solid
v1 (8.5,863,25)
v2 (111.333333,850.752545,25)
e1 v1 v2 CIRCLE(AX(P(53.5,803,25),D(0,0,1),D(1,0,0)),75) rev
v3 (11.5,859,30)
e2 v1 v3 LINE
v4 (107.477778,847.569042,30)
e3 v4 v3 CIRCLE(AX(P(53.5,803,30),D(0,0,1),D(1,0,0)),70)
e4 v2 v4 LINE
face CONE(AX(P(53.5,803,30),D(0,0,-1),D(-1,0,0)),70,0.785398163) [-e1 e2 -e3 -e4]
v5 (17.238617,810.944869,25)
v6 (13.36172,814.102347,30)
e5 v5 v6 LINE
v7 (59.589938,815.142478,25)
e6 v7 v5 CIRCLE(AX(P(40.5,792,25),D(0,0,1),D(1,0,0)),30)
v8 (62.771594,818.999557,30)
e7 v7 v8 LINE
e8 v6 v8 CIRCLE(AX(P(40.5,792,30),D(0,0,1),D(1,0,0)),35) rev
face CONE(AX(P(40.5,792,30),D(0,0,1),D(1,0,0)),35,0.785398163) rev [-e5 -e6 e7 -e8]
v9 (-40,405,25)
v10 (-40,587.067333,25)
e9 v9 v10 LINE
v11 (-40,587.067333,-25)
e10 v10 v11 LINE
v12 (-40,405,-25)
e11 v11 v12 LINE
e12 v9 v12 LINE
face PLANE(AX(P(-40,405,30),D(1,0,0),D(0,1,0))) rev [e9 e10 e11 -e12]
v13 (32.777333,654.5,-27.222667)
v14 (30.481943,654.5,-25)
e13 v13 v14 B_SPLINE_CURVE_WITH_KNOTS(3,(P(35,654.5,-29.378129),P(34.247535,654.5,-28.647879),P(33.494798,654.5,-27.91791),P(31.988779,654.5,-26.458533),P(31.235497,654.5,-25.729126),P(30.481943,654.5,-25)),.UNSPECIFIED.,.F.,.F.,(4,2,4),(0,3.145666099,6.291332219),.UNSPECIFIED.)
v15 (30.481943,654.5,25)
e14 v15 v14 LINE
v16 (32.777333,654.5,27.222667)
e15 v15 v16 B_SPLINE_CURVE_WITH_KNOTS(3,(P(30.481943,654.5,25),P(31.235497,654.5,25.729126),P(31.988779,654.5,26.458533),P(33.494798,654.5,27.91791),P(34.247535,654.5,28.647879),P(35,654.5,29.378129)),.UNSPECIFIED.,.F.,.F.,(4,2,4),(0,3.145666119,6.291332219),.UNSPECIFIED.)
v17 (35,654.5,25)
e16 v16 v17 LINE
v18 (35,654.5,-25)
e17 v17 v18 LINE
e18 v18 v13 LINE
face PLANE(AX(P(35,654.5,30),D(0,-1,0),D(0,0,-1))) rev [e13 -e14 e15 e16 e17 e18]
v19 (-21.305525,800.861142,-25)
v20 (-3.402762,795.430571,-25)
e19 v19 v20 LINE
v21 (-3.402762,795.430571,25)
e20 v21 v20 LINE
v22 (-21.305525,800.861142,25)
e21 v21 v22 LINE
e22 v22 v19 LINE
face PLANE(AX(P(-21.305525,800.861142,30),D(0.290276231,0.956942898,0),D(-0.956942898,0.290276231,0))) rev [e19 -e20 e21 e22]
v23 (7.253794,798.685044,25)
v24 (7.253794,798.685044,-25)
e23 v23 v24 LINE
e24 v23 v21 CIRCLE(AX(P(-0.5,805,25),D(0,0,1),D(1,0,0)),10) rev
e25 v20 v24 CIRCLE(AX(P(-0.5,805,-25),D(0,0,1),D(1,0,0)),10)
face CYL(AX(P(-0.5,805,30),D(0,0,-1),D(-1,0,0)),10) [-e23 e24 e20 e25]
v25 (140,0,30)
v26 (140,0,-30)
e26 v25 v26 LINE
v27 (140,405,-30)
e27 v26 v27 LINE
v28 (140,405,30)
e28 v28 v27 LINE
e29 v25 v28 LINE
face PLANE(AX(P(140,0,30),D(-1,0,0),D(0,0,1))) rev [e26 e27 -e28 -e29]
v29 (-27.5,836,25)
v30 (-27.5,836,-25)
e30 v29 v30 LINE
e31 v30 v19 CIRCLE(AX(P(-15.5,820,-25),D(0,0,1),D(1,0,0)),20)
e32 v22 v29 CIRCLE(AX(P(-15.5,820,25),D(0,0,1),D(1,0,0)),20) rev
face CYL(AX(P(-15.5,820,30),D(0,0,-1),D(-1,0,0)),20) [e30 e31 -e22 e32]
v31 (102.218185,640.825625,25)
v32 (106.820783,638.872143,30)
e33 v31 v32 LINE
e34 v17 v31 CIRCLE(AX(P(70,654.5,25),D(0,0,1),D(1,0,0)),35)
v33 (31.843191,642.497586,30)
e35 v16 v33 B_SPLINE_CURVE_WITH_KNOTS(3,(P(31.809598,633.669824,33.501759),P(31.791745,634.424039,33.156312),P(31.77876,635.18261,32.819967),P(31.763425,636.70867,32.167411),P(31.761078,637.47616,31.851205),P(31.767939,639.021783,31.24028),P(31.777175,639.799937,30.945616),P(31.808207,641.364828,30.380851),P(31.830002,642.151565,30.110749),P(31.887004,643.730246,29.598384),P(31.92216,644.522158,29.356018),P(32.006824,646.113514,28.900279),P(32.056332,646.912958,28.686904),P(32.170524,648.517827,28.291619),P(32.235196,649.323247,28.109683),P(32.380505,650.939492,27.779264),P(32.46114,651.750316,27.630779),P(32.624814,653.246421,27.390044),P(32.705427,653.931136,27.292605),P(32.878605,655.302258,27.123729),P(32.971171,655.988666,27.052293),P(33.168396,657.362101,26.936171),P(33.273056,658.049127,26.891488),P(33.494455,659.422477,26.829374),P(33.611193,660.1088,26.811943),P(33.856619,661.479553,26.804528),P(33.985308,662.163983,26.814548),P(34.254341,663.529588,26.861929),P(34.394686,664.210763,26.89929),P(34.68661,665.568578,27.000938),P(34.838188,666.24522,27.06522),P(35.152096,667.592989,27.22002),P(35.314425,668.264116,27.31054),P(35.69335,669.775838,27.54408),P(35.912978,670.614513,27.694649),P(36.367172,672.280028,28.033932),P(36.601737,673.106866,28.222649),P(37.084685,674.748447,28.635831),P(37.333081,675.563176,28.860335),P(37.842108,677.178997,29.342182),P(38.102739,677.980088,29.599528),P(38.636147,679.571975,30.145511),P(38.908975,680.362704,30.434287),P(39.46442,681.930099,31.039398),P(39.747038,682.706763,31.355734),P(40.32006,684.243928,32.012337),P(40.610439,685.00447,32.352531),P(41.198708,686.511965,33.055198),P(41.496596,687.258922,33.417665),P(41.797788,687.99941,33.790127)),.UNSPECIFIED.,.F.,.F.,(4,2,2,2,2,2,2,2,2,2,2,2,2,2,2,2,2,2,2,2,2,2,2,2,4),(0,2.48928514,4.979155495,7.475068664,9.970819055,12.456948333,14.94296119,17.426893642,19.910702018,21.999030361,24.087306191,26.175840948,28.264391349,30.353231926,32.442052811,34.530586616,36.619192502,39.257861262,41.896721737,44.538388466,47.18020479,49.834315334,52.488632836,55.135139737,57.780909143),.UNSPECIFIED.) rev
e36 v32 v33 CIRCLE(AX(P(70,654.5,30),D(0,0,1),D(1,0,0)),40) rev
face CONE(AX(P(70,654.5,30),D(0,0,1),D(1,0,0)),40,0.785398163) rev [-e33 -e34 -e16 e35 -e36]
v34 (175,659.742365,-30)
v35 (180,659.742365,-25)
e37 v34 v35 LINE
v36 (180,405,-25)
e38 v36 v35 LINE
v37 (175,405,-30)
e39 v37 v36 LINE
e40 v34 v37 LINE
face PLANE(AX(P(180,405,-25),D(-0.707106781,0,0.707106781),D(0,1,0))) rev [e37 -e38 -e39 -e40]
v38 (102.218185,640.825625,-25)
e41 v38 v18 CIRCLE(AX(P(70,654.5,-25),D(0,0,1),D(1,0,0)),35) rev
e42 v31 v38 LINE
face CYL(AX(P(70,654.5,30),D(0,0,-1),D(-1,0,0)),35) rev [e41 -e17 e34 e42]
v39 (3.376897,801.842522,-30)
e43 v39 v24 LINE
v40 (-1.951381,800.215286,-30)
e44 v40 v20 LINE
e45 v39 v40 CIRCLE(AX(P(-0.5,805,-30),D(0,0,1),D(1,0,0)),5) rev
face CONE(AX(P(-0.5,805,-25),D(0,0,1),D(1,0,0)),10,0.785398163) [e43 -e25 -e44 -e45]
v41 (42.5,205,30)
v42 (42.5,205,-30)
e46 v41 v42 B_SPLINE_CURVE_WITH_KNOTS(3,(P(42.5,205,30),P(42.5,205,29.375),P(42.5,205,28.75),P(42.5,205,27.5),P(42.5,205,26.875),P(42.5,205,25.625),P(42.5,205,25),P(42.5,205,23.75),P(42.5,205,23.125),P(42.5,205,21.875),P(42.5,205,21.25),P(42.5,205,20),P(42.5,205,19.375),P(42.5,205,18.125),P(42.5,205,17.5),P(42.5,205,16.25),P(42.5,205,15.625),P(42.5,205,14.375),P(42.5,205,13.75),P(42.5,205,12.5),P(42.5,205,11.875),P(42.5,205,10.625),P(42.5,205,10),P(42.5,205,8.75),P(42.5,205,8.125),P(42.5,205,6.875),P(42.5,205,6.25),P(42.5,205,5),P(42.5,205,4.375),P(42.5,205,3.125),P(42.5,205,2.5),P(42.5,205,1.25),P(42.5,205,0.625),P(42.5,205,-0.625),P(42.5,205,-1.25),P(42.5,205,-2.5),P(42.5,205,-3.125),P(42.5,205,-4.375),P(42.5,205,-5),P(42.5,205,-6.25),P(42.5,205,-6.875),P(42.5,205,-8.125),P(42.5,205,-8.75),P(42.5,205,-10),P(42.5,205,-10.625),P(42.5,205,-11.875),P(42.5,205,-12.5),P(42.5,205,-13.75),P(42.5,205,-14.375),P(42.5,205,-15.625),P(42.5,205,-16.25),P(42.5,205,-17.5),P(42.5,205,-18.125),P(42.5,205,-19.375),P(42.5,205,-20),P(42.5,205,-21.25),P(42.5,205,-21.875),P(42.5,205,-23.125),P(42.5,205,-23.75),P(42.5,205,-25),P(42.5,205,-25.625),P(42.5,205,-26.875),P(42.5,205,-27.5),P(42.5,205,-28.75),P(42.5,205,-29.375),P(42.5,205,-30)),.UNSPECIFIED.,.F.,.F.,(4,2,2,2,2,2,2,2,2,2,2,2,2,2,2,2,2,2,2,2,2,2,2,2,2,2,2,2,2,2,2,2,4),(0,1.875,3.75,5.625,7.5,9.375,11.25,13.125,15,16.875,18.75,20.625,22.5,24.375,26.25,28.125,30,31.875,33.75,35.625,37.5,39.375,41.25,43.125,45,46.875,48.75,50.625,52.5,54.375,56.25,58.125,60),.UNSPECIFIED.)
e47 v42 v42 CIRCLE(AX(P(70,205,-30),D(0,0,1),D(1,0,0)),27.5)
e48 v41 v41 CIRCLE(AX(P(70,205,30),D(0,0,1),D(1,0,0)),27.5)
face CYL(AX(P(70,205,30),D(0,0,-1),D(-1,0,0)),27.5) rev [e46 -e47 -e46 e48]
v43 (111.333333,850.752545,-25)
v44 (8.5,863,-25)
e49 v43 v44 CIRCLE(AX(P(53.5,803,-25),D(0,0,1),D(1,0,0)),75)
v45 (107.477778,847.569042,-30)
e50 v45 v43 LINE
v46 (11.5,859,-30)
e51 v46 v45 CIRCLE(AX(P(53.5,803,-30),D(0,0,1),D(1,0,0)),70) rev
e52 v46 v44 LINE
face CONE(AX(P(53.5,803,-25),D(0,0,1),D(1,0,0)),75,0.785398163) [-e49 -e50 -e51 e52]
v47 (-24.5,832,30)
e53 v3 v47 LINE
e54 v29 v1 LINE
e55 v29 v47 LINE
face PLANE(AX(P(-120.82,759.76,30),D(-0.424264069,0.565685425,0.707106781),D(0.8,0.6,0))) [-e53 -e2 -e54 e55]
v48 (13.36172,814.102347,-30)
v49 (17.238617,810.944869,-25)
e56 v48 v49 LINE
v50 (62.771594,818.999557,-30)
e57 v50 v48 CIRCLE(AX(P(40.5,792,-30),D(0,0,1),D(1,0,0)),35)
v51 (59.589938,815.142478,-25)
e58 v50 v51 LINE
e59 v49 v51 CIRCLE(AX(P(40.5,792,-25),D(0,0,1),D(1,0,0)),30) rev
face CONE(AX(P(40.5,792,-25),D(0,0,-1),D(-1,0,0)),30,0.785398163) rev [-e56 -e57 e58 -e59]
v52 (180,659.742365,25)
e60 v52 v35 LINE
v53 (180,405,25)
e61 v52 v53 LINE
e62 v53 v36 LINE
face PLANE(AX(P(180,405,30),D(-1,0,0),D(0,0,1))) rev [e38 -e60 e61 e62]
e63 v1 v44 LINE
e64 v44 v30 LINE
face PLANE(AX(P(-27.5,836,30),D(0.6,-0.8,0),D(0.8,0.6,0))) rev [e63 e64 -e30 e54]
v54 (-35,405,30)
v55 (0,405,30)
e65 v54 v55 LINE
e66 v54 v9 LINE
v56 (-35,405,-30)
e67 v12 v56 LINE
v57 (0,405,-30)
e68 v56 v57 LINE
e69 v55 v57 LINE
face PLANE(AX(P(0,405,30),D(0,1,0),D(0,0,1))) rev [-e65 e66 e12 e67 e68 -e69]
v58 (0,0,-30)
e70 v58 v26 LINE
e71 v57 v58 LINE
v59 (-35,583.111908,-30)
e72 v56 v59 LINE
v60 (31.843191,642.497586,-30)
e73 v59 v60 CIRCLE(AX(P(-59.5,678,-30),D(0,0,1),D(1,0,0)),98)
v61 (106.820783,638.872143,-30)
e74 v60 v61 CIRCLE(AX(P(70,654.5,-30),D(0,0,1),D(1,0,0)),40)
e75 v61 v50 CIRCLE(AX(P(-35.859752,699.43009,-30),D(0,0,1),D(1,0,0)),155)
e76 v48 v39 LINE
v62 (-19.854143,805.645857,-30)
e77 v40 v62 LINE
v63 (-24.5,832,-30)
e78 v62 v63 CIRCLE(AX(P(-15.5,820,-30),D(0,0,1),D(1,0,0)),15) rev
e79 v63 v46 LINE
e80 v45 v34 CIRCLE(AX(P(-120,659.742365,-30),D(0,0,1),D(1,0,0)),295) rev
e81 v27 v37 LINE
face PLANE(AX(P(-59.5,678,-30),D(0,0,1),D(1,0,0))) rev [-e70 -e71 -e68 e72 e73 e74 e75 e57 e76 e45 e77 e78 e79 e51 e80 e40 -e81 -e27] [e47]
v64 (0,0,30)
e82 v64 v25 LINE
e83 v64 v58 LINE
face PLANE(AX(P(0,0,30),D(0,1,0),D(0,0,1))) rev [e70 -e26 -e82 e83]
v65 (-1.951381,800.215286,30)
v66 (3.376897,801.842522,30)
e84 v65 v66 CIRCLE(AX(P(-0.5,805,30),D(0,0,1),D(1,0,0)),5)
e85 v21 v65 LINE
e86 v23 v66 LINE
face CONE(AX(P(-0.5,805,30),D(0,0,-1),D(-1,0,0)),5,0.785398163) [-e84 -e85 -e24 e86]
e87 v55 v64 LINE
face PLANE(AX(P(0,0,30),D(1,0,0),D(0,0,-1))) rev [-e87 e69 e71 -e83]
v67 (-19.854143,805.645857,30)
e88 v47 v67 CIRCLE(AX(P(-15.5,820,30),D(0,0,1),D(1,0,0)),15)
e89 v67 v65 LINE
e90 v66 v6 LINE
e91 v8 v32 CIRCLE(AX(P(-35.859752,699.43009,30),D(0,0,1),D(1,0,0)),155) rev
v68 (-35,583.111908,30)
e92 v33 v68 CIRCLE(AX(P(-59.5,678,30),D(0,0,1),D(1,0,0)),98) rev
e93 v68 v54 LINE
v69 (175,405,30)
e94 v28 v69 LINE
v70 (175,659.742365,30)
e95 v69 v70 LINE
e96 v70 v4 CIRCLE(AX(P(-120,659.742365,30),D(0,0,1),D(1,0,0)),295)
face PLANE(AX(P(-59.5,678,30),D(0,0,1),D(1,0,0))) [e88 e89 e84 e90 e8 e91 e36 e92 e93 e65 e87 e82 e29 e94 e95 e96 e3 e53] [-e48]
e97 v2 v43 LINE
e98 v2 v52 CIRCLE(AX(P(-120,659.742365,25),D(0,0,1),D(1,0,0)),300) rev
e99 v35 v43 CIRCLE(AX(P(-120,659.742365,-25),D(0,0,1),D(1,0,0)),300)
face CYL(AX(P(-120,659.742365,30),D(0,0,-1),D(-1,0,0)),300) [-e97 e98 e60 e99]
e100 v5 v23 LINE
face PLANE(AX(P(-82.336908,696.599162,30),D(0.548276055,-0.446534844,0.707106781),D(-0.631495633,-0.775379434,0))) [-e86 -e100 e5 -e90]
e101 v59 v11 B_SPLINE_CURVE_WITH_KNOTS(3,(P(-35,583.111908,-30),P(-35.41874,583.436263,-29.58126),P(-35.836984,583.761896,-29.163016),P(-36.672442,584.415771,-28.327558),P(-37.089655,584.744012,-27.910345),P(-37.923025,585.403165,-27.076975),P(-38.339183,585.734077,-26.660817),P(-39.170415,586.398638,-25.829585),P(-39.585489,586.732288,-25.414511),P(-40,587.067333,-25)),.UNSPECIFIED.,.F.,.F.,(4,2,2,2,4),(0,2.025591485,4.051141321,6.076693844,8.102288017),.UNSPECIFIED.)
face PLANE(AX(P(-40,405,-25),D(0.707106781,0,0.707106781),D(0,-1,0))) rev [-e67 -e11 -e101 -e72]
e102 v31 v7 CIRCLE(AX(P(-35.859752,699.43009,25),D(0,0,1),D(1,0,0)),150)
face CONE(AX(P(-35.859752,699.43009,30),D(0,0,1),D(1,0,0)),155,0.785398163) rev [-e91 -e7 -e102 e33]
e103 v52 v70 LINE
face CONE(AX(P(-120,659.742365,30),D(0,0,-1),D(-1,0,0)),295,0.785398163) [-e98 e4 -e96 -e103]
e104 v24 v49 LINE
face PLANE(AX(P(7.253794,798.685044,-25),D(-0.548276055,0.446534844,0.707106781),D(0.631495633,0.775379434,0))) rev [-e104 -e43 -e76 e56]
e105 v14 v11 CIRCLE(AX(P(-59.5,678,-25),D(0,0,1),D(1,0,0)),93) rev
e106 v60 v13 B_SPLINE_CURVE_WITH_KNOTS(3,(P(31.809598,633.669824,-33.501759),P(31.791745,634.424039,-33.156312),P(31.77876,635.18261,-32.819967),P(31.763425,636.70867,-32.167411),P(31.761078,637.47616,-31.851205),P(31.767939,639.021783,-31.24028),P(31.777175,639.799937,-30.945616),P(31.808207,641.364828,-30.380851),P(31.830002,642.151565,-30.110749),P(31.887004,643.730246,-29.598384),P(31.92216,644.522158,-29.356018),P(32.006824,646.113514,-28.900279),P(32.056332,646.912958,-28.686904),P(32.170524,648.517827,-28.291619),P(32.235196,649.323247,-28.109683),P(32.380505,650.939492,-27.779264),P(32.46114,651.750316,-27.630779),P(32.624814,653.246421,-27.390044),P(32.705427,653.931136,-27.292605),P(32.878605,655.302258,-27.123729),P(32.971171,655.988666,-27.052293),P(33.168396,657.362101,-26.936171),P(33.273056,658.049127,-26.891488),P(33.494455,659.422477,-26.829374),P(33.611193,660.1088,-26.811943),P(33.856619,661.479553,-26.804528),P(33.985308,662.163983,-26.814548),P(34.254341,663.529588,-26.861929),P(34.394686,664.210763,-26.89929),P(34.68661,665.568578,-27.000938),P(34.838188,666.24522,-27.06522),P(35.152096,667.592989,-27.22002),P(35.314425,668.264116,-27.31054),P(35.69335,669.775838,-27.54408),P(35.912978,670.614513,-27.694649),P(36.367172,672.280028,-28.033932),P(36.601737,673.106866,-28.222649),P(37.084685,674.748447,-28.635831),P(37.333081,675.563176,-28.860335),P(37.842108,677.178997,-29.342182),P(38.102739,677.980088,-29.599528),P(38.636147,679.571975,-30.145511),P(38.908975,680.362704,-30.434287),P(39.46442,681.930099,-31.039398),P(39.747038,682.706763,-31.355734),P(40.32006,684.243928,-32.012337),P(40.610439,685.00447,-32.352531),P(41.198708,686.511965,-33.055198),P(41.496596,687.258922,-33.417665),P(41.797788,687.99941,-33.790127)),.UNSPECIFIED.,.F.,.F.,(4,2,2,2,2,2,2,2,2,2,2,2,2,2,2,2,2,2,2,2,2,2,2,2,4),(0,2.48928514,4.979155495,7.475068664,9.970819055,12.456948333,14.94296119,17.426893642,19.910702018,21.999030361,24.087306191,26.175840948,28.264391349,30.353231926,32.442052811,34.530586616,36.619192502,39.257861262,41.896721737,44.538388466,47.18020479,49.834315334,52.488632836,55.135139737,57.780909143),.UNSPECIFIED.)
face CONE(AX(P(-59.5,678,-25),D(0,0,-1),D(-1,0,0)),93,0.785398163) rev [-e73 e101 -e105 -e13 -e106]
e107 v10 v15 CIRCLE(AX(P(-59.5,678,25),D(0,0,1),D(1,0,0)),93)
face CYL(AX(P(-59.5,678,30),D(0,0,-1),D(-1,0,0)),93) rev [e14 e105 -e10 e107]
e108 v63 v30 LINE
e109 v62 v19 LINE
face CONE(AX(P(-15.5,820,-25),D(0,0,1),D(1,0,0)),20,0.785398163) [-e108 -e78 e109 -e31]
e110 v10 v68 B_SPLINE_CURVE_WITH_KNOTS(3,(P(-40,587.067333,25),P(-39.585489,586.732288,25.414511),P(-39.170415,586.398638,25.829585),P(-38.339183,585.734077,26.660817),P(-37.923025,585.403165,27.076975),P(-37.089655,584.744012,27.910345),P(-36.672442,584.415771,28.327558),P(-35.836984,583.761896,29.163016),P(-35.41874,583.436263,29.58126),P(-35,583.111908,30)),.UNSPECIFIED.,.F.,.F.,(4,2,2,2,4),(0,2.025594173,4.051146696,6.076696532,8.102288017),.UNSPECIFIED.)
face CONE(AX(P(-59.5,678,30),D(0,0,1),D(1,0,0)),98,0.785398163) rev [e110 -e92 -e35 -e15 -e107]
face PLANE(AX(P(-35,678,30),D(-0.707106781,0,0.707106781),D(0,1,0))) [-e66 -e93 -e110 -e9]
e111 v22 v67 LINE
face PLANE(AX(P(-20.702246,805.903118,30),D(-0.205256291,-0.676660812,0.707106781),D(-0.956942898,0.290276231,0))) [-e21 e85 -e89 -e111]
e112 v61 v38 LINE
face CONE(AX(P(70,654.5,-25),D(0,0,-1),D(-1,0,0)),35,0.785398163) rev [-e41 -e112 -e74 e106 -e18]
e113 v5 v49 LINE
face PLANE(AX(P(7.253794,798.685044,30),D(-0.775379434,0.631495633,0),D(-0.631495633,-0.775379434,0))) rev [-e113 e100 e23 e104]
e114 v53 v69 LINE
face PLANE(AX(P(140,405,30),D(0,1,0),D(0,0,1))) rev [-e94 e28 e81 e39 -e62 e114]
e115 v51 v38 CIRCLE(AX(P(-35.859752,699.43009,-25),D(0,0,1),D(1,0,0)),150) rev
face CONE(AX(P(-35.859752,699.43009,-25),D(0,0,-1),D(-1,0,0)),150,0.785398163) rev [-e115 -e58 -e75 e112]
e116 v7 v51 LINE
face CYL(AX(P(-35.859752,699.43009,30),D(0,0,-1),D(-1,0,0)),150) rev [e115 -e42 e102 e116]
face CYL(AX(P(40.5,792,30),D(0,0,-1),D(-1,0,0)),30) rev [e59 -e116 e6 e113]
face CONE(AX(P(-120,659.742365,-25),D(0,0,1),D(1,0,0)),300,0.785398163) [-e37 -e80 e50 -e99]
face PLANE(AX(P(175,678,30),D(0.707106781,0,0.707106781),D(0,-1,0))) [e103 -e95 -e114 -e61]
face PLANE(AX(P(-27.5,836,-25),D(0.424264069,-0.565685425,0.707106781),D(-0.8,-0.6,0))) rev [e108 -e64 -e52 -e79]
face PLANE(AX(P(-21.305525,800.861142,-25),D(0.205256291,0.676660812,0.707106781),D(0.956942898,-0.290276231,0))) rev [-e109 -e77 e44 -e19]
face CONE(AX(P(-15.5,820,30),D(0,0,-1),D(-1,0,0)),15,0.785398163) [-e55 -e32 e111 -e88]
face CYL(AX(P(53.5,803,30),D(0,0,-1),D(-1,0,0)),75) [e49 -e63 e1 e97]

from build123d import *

# Parameters (mm, degrees)
SKETCH_1_R      = 27.5
EXTRUDE_1_DEPTH = 30
CHAMFER_1_SIZE  = 5


with BuildPart() as part:
    # 草图1 → 凸台-拉伸1 (new, symmetric)
    with BuildSketch(Plane.XY):
        with BuildLine():
            Line((140, 405), (180, 405))
            Line((180, 405), (180, 659.74236495))
            ThreePointArc((180, 659.74236495), (162.31188427, 761.231280601), (111.333333333, 850.752545017))
            ThreePointArc((111.333333333, 850.752545017), (62.369816768, 877.473662126), (8.5, 863))
            Line((8.5, 863), (-27.5, 836))
            ThreePointArc((-27.5, 836), (-35.196294357, 816.527826528), (-21.305524623, 800.861142044))
            Line((-21.305524623, 800.861142044), (-3.402762311, 795.430571022))
            ThreePointArc((-3.402762311, 795.430571022), (2.420792013, 795.436058657), (7.253794336, 798.685043674))
            Line((7.253794336, 798.685043674), (17.238616993, 810.944868978))
            ThreePointArc((17.238616993, 810.944868978), (37.541078237, 821.853723084), (59.589937945, 815.142477595))
            ThreePointArc((59.589937945, 815.142477595), (109.84673197, 735.06182538), (102.218185324, 640.825624899))
            ThreePointArc((102.218185324, 640.825624899), (63.022768685, 620.202503835), (35, 654.5))
            Line((35, 654.5), (30.481942633, 654.5))
            ThreePointArc((30.481942633, 654.5), (4.791252117, 610.80152605), (-40, 587.067332603))
            Line((-40, 587.067332603), (-40, 405))
            Line((-40, 405), (0, 405))
            Line((0, 405), (0, 0))
            Line((0, 0), (140, 0))
            Line((140, 0), (140, 405))
        make_face()
        with Locations((70, 205)):
            Circle(SKETCH_1_R, mode=Mode.SUBTRACT)
    extrude(amount=EXTRUDE_1_DEPTH, both=True)

    # 倒角1
    # the kernel refuses this chamfer: 5 mm, written as the material it takes off along each edge
    with BuildSketch(Plane(origin=(-59.5, 678, -30), x_dir=(0.9931437230377144, -0.11689972365573639, 0), z_dir=(0.11689972365573639, 0.9931437230377144, 0))) as chamfer_1_piece_1:
        Polygon((93, -CHAMFER_1_SIZE), (93 + CHAMFER_1_SIZE, 0), (93, 0), align=None)
    revolve(axis=Axis((-59.5, 678, -30), (0, 0, -1)), revolution_arc=79.106771972, mode=Mode.SUBTRACT)
    with BuildSketch(Plane(origin=(-59.5, 678, 30), x_dir=(0.9931437230377144, -0.11689972365573639, 0), z_dir=(0.11689972365573639, 0.9931437230377144, 0))) as chamfer_1_piece_2:
        Polygon((93 + CHAMFER_1_SIZE, 0), (93, CHAMFER_1_SIZE), (93, 0), align=None)
    revolve(axis=Axis((-59.5, 678, 30), (0, 0, -1)), revolution_arc=79.106771972, mode=Mode.SUBTRACT)
    with BuildSketch(Plane(origin=(180, 392.14158506, -30), x_dir=(0.0274958766105877, 0, 0.9996219169112968), z_dir=(0, 1, 0))) as chamfer_1_piece_3:
        Polygon((CHAMFER_1_SIZE * 0.999621916911, -CHAMFER_1_SIZE * 0.0274958766106), (-CHAMFER_1_SIZE * 0.0274958766106, -CHAMFER_1_SIZE * 0.999621916911), (0, 0), align=None)
    extrude(amount=267.60077989, mode=Mode.SUBTRACT)
    with BuildSketch(Plane(origin=(-120, 659.74236495, -30), x_dir=(1, 0, 0), z_dir=(0, -1, 0))) as chamfer_1_piece_4:
        Polygon((300, CHAMFER_1_SIZE), (300 - CHAMFER_1_SIZE, 0), (300, 0), align=None)
    revolve(axis=Axis((-120, 659.74236495, -30), (0, 0, 1)), revolution_arc=39.546229231, mode=Mode.SUBTRACT)
    with BuildSketch(Plane(origin=(53.5, 803, -30), x_dir=(0.7711111111111113, 0.6367006002203762, 0), z_dir=(0.6367006002203762, -0.7711111111111113, 0))) as chamfer_1_piece_5:
        Polygon((75, CHAMFER_1_SIZE), (75 - CHAMFER_1_SIZE, 0), (75, 0), align=None)
    revolve(axis=Axis((53.5, 803, -30), (0, 0, 1)), revolution_arc=87.323668415, mode=Mode.SUBTRACT)
    with BuildSketch(Plane(origin=(8.5, 863, -30), x_dir=(-0.01649752596635013, 0.02199670128846693, 0.9996219169112968), z_dir=(-0.8000000000000013, -0.5999999999999984, 0))) as chamfer_1_piece_6:
        Polygon((CHAMFER_1_SIZE * 0.999621916911, -CHAMFER_1_SIZE * 0.0274958766106), (-CHAMFER_1_SIZE * 0.0274958766106, -CHAMFER_1_SIZE * 0.999621916911), (0, 0), align=None)
    extrude(amount=45, mode=Mode.SUBTRACT)
    with BuildSketch(Plane(origin=(-15.5, 820, -30), x_dir=(-0.6000000000000103, 0.7999999999999922, 0), z_dir=(0.7999999999999922, 0.6000000000000103, 0))) as chamfer_1_piece_7:
        Polygon((20, CHAMFER_1_SIZE), (20 - CHAMFER_1_SIZE, 0), (20, 0), align=None)
    revolve(axis=Axis((-15.5, 820, -30), (0, 0, 1)), revolution_arc=126.255608056, mode=Mode.SUBTRACT)
    with BuildSketch(Plane(origin=(-21.305524623, 800.861142044, -30), x_dir=(-0.007981399434105696, -0.02631198384115636, 0.9996219169112971), z_dir=(0.9569428977956573, -0.29027623112898887, 0))) as chamfer_1_piece_8:
        Polygon((CHAMFER_1_SIZE * 0.999621916911, -CHAMFER_1_SIZE * 0.0274958766106), (-CHAMFER_1_SIZE * 0.0274958766106, -CHAMFER_1_SIZE * 0.999621916911), (0, 0), align=None)
    extrude(amount=18.708286934, mode=Mode.SUBTRACT)
    with BuildSketch(Plane(origin=(-0.5, 805, -30), x_dir=(-0.29027623112897577, -0.9569428977956612, 0), z_dir=(-0.9569428977956612, 0.29027623112897577, 0))) as chamfer_1_piece_9:
        Polygon((10, CHAMFER_1_SIZE), (10 - CHAMFER_1_SIZE, 0), (10, 0), align=None)
    revolve(axis=Axis((-0.5, 805, -30), (0, 0, 1)), revolution_arc=67.7139403, mode=Mode.SUBTRACT)
    with BuildSketch(Plane(origin=(7.253794336, 798.685043674, -30), x_dir=(0.021319737231601184, -0.01736352599446127, 0.9996219169112965), z_dir=(0.6314956326132553, 0.7753794335616496, 0))) as chamfer_1_piece_10:
        Polygon((CHAMFER_1_SIZE * 0.999621916911, -CHAMFER_1_SIZE * 0.0274958766106), (-CHAMFER_1_SIZE * 0.0274958766106, -CHAMFER_1_SIZE * 0.999621916911), (0, 0), align=None)
    extrude(amount=15.811388301, mode=Mode.SUBTRACT)
    with BuildSketch(Plane(origin=(40.5, 792, -30), x_dir=(-0.7753794335616501, 0.6314956326132546, 0), z_dir=(-0.6314956326132546, -0.7753794335616501, 0))) as chamfer_1_piece_11:
        Polygon((30, -CHAMFER_1_SIZE), (30 + CHAMFER_1_SIZE, 0), (30, 0), align=None)
    revolve(axis=Axis((40.5, 792, -30), (0, 0, -1)), revolution_arc=90.358237971, mode=Mode.SUBTRACT)
    with BuildSketch(Plane(origin=(-35.85975178, 699.430089618, -30), x_dir=(0.6363312648327024, 0.7714159198489573, 0), z_dir=(-0.7714159198489573, 0.6363312648327024, 0))) as chamfer_1_piece_12:
        Polygon((150, -CHAMFER_1_SIZE), (150 + CHAMFER_1_SIZE, 0), (150, 0), align=None)
    revolve(axis=Axis((-35.85975178, 699.430089618, -30), (0, 0, -1)), revolution_arc=73.479048371, mode=Mode.SUBTRACT)
    with BuildSketch(Plane(origin=(70, 654.5, -30), x_dir=(0.920519580694994, -0.39069643146196303, 0), z_dir=(0.39069643146196303, 0.920519580694994, 0))) as chamfer_1_piece_13:
        Polygon((35, -CHAMFER_1_SIZE), (35 + CHAMFER_1_SIZE, 0), (35, 0), align=None)
    revolve(axis=Axis((70, 654.5, -30), (0, 0, -1)), revolution_arc=178.077418405, mode=Mode.SUBTRACT)
    with BuildSketch(Plane(origin=(180, 392.14158506, 30), x_dir=(0.0274958766105877, 0, -0.9996219169112968), z_dir=(0, 1, 0))) as chamfer_1_piece_14:
        Polygon((CHAMFER_1_SIZE * 0.999621916911, CHAMFER_1_SIZE * 0.0274958766106), (-CHAMFER_1_SIZE * 0.0274958766106, CHAMFER_1_SIZE * 0.999621916911), (0, 0), align=None)
    extrude(amount=267.60077989, mode=Mode.SUBTRACT)
    with BuildSketch(Plane(origin=(-120, 659.74236495, 30), x_dir=(1, 0, 0), z_dir=(0, -1, 0))) as chamfer_1_piece_15:
        Polygon((300, -CHAMFER_1_SIZE), (300 - CHAMFER_1_SIZE, 0), (300, 0), align=None)
    revolve(axis=Axis((-120, 659.74236495, 30), (0, 0, 1)), revolution_arc=39.546229231, mode=Mode.SUBTRACT)
    with BuildSketch(Plane(origin=(53.5, 803, 30), x_dir=(0.7711111111111113, 0.6367006002203762, 0), z_dir=(0.6367006002203762, -0.7711111111111113, 0))) as chamfer_1_piece_16:
        Polygon((75, -CHAMFER_1_SIZE), (75 - CHAMFER_1_SIZE, 0), (75, 0), align=None)
    revolve(axis=Axis((53.5, 803, 30), (0, 0, 1)), revolution_arc=87.323668415, mode=Mode.SUBTRACT)
    with BuildSketch(Plane(origin=(8.5, 863, 30), x_dir=(-0.01649752596635013, 0.02199670128846693, -0.9996219169112968), z_dir=(-0.8000000000000013, -0.5999999999999984, 0))) as chamfer_1_piece_17:
        Polygon((CHAMFER_1_SIZE * 0.999621916911, CHAMFER_1_SIZE * 0.0274958766106), (-CHAMFER_1_SIZE * 0.0274958766106, CHAMFER_1_SIZE * 0.999621916911), (0, 0), align=None)
    extrude(amount=45, mode=Mode.SUBTRACT)
    with BuildSketch(Plane(origin=(-15.5, 820, 30), x_dir=(-0.6000000000000103, 0.7999999999999922, 0), z_dir=(0.7999999999999922, 0.6000000000000103, 0))) as chamfer_1_piece_18:
        Polygon((20, -CHAMFER_1_SIZE), (20 - CHAMFER_1_SIZE, 0), (20, 0), align=None)
    revolve(axis=Axis((-15.5, 820, 30), (0, 0, 1)), revolution_arc=126.255608056, mode=Mode.SUBTRACT)
    with BuildSketch(Plane(origin=(-21.305524623, 800.861142044, 30), x_dir=(-0.007981399434105696, -0.02631198384115636, -0.9996219169112971), z_dir=(0.9569428977956573, -0.29027623112898887, 0))) as chamfer_1_piece_19:
        Polygon((CHAMFER_1_SIZE * 0.999621916911, CHAMFER_1_SIZE * 0.0274958766106), (-CHAMFER_1_SIZE * 0.0274958766106, CHAMFER_1_SIZE * 0.999621916911), (0, 0), align=None)
    extrude(amount=18.708286934, mode=Mode.SUBTRACT)
    with BuildSketch(Plane(origin=(-0.5, 805, 30), x_dir=(-0.29027623112897577, -0.9569428977956612, 0), z_dir=(-0.9569428977956612, 0.29027623112897577, 0))) as chamfer_1_piece_20:
        Polygon((10, -CHAMFER_1_SIZE), (10 - CHAMFER_1_SIZE, 0), (10, 0), align=None)
    revolve(axis=Axis((-0.5, 805, 30), (0, 0, 1)), revolution_arc=67.7139403, mode=Mode.SUBTRACT)
    with BuildSketch(Plane(origin=(7.253794336, 798.685043674, 30), x_dir=(0.021319737231601184, -0.01736352599446127, -0.9996219169112965), z_dir=(0.6314956326132553, 0.7753794335616496, 0))) as chamfer_1_piece_21:
        Polygon((CHAMFER_1_SIZE * 0.999621916911, CHAMFER_1_SIZE * 0.0274958766106), (-CHAMFER_1_SIZE * 0.0274958766106, CHAMFER_1_SIZE * 0.999621916911), (0, 0), align=None)
    extrude(amount=15.811388301, mode=Mode.SUBTRACT)
    with BuildSketch(Plane(origin=(40.5, 792, 30), x_dir=(-0.7753794335616501, 0.6314956326132546, 0), z_dir=(-0.6314956326132546, -0.7753794335616501, 0))) as chamfer_1_piece_22:
        Polygon((30, CHAMFER_1_SIZE), (30 + CHAMFER_1_SIZE, 0), (30, 0), align=None)
    revolve(axis=Axis((40.5, 792, 30), (0, 0, -1)), revolution_arc=90.358237971, mode=Mode.SUBTRACT)
    with BuildSketch(Plane(origin=(-35.85975178, 699.430089618, 30), x_dir=(0.6363312648327024, 0.7714159198489573, 0), z_dir=(-0.7714159198489573, 0.6363312648327024, 0))) as chamfer_1_piece_23:
        Polygon((150, CHAMFER_1_SIZE), (150 + CHAMFER_1_SIZE, 0), (150, 0), align=None)
    revolve(axis=Axis((-35.85975178, 699.430089618, 30), (0, 0, -1)), revolution_arc=73.479048371, mode=Mode.SUBTRACT)
    with BuildSketch(Plane(origin=(70, 654.5, 30), x_dir=(0.920519580694994, -0.39069643146196303, 0), z_dir=(0.39069643146196303, 0.920519580694994, 0))) as chamfer_1_piece_24:
        Polygon((35, CHAMFER_1_SIZE), (35 + CHAMFER_1_SIZE, 0), (35, 0), align=None)
    revolve(axis=Axis((70, 654.5, 30), (0, 0, -1)), revolution_arc=178.077418405, mode=Mode.SUBTRACT)
    with BuildSketch(Plane(origin=(-40, 599.925747542, -30), x_dir=(-0.027495876610586317, 0, 0.9996219169112968), z_dir=(0, -1, 0))) as chamfer_1_piece_25:
        Polygon((CHAMFER_1_SIZE * 0.999621916911, -CHAMFER_1_SIZE * 0.0274958766106), (-CHAMFER_1_SIZE * 0.0274958766106, -CHAMFER_1_SIZE * 0.999621916911), (0, 0), align=None)
    extrude(amount=207.784162482, mode=Mode.SUBTRACT)
    with BuildSketch(Plane(origin=(-40, 599.925747542, 30), x_dir=(-0.027495876610586317, 0, -0.9996219169112968), z_dir=(0, -1, 0))) as chamfer_1_piece_26:
        Polygon((CHAMFER_1_SIZE * 0.999621916911, CHAMFER_1_SIZE * 0.0274958766106), (-CHAMFER_1_SIZE * 0.0274958766106, CHAMFER_1_SIZE * 0.999621916911), (0, 0), align=None)
    extrude(amount=207.784162482, mode=Mode.SUBTRACT)


solid = part.part
